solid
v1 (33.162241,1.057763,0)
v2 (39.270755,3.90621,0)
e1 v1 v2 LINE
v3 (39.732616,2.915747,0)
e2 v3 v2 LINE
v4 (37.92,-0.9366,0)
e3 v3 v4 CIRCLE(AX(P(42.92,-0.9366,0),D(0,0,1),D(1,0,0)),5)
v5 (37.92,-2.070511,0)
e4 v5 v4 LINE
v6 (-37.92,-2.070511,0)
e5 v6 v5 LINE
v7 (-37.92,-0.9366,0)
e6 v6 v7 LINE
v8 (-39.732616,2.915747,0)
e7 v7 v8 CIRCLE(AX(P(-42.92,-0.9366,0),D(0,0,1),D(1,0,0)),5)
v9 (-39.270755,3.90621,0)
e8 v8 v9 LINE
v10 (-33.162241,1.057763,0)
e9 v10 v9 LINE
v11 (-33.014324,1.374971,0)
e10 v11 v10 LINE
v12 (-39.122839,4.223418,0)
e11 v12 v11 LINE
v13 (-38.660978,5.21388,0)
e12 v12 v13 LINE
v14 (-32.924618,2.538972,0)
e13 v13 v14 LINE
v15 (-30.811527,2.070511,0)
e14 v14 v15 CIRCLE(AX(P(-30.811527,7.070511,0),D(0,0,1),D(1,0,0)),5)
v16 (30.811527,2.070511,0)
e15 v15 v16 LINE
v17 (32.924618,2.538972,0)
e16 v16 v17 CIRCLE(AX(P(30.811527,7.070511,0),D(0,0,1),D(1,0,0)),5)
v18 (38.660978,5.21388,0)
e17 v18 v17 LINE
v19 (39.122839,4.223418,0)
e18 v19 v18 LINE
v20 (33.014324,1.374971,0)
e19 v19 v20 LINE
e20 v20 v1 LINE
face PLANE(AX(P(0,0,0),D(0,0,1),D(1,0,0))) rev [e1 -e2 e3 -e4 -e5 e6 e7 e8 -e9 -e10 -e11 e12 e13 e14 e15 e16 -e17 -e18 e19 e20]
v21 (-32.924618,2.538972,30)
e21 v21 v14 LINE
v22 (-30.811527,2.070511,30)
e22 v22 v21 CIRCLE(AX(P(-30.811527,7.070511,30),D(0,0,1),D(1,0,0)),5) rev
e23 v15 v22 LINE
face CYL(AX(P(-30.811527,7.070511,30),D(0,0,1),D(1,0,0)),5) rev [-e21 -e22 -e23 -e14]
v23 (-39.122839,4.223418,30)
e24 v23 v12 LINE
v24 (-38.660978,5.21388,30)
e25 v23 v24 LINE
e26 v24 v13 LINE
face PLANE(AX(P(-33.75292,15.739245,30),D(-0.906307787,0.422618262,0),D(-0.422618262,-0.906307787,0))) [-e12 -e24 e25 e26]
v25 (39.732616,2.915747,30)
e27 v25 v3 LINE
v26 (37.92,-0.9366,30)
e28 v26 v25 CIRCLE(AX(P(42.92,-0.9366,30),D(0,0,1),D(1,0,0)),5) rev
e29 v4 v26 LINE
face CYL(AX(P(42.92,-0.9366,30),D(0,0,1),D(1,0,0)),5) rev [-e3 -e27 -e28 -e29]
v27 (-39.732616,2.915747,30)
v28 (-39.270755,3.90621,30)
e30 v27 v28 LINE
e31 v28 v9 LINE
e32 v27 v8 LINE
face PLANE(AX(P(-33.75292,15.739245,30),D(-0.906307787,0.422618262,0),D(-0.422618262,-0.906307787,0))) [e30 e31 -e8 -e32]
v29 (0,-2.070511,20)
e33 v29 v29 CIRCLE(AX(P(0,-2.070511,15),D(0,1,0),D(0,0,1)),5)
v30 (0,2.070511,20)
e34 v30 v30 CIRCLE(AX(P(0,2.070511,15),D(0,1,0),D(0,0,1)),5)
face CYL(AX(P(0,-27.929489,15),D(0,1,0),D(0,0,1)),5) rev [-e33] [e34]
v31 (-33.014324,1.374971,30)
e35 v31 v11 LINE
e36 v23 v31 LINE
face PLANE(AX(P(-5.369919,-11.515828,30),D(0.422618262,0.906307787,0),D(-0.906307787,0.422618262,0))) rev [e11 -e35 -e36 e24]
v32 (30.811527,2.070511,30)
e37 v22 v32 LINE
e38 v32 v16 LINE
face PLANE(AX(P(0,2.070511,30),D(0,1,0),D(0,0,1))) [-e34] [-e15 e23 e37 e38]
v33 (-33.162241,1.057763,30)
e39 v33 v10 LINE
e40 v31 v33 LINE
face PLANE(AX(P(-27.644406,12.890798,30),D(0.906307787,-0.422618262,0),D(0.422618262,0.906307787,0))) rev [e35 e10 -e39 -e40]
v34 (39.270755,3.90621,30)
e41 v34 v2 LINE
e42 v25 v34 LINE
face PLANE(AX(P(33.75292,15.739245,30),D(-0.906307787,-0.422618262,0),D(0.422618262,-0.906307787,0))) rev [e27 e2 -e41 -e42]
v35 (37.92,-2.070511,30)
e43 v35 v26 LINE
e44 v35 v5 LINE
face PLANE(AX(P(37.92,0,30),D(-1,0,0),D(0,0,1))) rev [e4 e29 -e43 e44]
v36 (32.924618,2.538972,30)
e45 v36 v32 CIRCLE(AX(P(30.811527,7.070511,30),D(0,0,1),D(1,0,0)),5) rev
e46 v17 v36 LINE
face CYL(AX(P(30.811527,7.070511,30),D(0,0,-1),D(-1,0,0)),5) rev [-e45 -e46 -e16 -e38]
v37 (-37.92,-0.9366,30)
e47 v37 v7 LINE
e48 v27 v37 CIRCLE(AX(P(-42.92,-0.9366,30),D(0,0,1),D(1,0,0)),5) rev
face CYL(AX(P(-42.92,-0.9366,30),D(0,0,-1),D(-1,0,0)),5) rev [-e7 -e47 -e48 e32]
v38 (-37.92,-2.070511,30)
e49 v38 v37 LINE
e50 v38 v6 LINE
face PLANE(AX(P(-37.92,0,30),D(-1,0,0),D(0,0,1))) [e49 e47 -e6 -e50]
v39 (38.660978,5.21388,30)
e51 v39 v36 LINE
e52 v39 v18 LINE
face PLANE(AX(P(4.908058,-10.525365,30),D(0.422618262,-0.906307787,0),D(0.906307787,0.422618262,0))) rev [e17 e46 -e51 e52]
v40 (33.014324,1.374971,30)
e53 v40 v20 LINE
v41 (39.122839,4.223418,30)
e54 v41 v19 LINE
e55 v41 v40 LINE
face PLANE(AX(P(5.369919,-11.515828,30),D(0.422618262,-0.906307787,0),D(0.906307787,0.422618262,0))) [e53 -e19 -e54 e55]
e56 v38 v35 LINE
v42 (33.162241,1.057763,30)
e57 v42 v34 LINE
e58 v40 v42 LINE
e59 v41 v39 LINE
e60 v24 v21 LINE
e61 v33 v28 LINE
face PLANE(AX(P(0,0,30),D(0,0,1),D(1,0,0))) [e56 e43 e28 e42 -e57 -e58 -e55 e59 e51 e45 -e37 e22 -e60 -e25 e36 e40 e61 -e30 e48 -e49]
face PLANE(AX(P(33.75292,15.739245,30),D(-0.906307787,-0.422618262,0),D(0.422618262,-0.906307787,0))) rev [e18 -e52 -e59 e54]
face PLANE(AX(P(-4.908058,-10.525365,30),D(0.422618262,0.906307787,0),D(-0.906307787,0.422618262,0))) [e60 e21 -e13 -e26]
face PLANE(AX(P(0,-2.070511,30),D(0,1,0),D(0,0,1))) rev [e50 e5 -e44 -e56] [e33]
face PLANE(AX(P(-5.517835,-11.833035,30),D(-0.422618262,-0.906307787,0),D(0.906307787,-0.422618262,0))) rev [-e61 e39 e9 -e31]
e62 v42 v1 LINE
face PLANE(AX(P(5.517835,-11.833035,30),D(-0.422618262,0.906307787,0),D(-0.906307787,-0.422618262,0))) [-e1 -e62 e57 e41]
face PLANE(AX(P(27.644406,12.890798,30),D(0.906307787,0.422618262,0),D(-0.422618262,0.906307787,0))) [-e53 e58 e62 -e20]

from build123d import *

# Parameters (mm, degrees)
BOSS_EXTRUDE1_DEPTH = 30
FILLET1_R           = 5
SKETCH2_R           = 5
CUT_EXTRUDE1_DEPTH  = 30


with BuildPart() as part:
    # Sketch1 → Boss-Extrude1 (new body)
    with BuildSketch(Plane.XY):
        Polygon((37.92, -2.070510622), (37.92, 2.070510622), (35.334085277, 2.070510622), (33.1622407, 1.057762863), (33.014324308, 1.374970589), (34.505914723, 2.070510622), (31.92, 2.070510622), (-31.92, 2.070510622), (-34.505914723, 2.070510622), (-33.014324308, 1.374970589), (-33.1622407, 1.057762863), (-35.334085277, 2.070510622), (-37.92, 2.070510622), (-37.92, -2.070510622), align=None)
        Polygon((-39.732615574, 2.915747145), (-37.92, 2.070510622), (-35.334085277, 2.070510622), (-39.270755184, 3.906209947), align=None)
        Polygon((-34.505914723, 2.070510622), (-31.92, 2.070510622), (-38.660978403, 5.213880475), (-39.122838793, 4.223417673), align=None)
        Polygon((31.92, 2.070510622), (34.505914723, 2.070510622), (39.122838793, 4.223417673), (38.660978403, 5.213880475), align=None)
        Polygon((35.334085277, 2.070510622), (37.92, 2.070510622), (39.732615574, 2.915747145), (39.270755184, 3.906209947), align=None)
    extrude(amount=BOSS_EXTRUDE1_DEPTH)

    # Fillet1
    # the kernel refuses this fillet: 5 mm, written as the material it adds along each edge
    with BuildSketch(Plane(origin=(37.92, 2.070510622, 0), x_dir=(0, -1, 0), z_dir=(0, 0, 1))) as fillet1_piece_1:
        with BuildLine():
            CenterArc((3.007110881, 5), FILLET1_R, 219.603933445, 50.396066555)
            Line((-0.845236523, 1.812615574), (-0.922283472, 1.748867886))
            ThreePointArc((-0.922283472, 1.748867886), (-0.51324904, 0.864045961), (-0.090630779, -0.042261826))
            Line((-0.090630779, -0.042261826), (0, -0.1))
            Line((0, -0.1), (3.007110881, -0.1))
            Line((3.007110881, -0.1), (3.007110881, 0))
        make_face()
    extrude(amount=30)
    with BuildSketch(Plane(origin=(-37.92, 2.070510622, 0), x_dir=(0, -1, 0), z_dir=(0, 0, 1))) as fillet1_piece_2:
        with BuildLine():
            CenterArc((3.007110881, -5), FILLET1_R, 90, 50.396066555)
            Line((-0.845236523, -1.812615574), (-0.922283472, -1.748867886))
            ThreePointArc((-0.922283472, -1.748867886), (-0.51324904, -0.864045961), (-0.090630779, 0.042261826))
            Line((-0.090630779, 0.042261826), (0, 0.1))
            Line((0, 0.1), (3.007110881, 0.1))
            Line((3.007110881, 0.1), (3.007110881, 0))
        make_face()
    extrude(amount=30)
    with BuildSketch(Plane(origin=(31.92, 2.070510622, 0), x_dir=(-1, 0, 0), z_dir=(0, 0, 1)), Plane(origin=(-31.92, 2.070510622, 0), x_dir=(-0.9063077870366495, 0.4226182617407004, 0), z_dir=(0, 0, 1))) as fillet1_piece_3:
        with BuildLine():
            CenterArc((FILLET1_R * 0.221694662643, -FILLET1_R), FILLET1_R, 90, 25)
            Line((-FILLET1_R * 0.200923599098, -FILLET1_R * 0.0936922129634), (-FILLET1_R * 0.209375964333, -FILLET1_R * 0.0755660572226))
            Line((-FILLET1_R * 0.209375964333, -FILLET1_R * 0.0755660572226), (-FILLET1_R * 0.00443389325286, FILLET1_R * 0.02))
            Line((-FILLET1_R * 0.00443389325286, FILLET1_R * 0.02), (FILLET1_R * 0.221694662643, FILLET1_R * 0.02))
            Line((FILLET1_R * 0.221694662643, FILLET1_R * 0.02), (FILLET1_R * 0.221694662643, 0))
        make_face()
    extrude(amount=30)

    # Sketch2 → Cut-Extrude1 (cut)
    with BuildSketch(Plane(origin=(0, 2.070510622, 0), x_dir=(1, 0, 0), z_dir=(0, 1, 0))):
        with Locations(Location((0, -15, 0), (0, 0, 270))):
            Circle(SKETCH2_R)
    extrude(amount=-CUT_EXTRUDE1_DEPTH, mode=Mode.SUBTRACT)


solid = part.part
